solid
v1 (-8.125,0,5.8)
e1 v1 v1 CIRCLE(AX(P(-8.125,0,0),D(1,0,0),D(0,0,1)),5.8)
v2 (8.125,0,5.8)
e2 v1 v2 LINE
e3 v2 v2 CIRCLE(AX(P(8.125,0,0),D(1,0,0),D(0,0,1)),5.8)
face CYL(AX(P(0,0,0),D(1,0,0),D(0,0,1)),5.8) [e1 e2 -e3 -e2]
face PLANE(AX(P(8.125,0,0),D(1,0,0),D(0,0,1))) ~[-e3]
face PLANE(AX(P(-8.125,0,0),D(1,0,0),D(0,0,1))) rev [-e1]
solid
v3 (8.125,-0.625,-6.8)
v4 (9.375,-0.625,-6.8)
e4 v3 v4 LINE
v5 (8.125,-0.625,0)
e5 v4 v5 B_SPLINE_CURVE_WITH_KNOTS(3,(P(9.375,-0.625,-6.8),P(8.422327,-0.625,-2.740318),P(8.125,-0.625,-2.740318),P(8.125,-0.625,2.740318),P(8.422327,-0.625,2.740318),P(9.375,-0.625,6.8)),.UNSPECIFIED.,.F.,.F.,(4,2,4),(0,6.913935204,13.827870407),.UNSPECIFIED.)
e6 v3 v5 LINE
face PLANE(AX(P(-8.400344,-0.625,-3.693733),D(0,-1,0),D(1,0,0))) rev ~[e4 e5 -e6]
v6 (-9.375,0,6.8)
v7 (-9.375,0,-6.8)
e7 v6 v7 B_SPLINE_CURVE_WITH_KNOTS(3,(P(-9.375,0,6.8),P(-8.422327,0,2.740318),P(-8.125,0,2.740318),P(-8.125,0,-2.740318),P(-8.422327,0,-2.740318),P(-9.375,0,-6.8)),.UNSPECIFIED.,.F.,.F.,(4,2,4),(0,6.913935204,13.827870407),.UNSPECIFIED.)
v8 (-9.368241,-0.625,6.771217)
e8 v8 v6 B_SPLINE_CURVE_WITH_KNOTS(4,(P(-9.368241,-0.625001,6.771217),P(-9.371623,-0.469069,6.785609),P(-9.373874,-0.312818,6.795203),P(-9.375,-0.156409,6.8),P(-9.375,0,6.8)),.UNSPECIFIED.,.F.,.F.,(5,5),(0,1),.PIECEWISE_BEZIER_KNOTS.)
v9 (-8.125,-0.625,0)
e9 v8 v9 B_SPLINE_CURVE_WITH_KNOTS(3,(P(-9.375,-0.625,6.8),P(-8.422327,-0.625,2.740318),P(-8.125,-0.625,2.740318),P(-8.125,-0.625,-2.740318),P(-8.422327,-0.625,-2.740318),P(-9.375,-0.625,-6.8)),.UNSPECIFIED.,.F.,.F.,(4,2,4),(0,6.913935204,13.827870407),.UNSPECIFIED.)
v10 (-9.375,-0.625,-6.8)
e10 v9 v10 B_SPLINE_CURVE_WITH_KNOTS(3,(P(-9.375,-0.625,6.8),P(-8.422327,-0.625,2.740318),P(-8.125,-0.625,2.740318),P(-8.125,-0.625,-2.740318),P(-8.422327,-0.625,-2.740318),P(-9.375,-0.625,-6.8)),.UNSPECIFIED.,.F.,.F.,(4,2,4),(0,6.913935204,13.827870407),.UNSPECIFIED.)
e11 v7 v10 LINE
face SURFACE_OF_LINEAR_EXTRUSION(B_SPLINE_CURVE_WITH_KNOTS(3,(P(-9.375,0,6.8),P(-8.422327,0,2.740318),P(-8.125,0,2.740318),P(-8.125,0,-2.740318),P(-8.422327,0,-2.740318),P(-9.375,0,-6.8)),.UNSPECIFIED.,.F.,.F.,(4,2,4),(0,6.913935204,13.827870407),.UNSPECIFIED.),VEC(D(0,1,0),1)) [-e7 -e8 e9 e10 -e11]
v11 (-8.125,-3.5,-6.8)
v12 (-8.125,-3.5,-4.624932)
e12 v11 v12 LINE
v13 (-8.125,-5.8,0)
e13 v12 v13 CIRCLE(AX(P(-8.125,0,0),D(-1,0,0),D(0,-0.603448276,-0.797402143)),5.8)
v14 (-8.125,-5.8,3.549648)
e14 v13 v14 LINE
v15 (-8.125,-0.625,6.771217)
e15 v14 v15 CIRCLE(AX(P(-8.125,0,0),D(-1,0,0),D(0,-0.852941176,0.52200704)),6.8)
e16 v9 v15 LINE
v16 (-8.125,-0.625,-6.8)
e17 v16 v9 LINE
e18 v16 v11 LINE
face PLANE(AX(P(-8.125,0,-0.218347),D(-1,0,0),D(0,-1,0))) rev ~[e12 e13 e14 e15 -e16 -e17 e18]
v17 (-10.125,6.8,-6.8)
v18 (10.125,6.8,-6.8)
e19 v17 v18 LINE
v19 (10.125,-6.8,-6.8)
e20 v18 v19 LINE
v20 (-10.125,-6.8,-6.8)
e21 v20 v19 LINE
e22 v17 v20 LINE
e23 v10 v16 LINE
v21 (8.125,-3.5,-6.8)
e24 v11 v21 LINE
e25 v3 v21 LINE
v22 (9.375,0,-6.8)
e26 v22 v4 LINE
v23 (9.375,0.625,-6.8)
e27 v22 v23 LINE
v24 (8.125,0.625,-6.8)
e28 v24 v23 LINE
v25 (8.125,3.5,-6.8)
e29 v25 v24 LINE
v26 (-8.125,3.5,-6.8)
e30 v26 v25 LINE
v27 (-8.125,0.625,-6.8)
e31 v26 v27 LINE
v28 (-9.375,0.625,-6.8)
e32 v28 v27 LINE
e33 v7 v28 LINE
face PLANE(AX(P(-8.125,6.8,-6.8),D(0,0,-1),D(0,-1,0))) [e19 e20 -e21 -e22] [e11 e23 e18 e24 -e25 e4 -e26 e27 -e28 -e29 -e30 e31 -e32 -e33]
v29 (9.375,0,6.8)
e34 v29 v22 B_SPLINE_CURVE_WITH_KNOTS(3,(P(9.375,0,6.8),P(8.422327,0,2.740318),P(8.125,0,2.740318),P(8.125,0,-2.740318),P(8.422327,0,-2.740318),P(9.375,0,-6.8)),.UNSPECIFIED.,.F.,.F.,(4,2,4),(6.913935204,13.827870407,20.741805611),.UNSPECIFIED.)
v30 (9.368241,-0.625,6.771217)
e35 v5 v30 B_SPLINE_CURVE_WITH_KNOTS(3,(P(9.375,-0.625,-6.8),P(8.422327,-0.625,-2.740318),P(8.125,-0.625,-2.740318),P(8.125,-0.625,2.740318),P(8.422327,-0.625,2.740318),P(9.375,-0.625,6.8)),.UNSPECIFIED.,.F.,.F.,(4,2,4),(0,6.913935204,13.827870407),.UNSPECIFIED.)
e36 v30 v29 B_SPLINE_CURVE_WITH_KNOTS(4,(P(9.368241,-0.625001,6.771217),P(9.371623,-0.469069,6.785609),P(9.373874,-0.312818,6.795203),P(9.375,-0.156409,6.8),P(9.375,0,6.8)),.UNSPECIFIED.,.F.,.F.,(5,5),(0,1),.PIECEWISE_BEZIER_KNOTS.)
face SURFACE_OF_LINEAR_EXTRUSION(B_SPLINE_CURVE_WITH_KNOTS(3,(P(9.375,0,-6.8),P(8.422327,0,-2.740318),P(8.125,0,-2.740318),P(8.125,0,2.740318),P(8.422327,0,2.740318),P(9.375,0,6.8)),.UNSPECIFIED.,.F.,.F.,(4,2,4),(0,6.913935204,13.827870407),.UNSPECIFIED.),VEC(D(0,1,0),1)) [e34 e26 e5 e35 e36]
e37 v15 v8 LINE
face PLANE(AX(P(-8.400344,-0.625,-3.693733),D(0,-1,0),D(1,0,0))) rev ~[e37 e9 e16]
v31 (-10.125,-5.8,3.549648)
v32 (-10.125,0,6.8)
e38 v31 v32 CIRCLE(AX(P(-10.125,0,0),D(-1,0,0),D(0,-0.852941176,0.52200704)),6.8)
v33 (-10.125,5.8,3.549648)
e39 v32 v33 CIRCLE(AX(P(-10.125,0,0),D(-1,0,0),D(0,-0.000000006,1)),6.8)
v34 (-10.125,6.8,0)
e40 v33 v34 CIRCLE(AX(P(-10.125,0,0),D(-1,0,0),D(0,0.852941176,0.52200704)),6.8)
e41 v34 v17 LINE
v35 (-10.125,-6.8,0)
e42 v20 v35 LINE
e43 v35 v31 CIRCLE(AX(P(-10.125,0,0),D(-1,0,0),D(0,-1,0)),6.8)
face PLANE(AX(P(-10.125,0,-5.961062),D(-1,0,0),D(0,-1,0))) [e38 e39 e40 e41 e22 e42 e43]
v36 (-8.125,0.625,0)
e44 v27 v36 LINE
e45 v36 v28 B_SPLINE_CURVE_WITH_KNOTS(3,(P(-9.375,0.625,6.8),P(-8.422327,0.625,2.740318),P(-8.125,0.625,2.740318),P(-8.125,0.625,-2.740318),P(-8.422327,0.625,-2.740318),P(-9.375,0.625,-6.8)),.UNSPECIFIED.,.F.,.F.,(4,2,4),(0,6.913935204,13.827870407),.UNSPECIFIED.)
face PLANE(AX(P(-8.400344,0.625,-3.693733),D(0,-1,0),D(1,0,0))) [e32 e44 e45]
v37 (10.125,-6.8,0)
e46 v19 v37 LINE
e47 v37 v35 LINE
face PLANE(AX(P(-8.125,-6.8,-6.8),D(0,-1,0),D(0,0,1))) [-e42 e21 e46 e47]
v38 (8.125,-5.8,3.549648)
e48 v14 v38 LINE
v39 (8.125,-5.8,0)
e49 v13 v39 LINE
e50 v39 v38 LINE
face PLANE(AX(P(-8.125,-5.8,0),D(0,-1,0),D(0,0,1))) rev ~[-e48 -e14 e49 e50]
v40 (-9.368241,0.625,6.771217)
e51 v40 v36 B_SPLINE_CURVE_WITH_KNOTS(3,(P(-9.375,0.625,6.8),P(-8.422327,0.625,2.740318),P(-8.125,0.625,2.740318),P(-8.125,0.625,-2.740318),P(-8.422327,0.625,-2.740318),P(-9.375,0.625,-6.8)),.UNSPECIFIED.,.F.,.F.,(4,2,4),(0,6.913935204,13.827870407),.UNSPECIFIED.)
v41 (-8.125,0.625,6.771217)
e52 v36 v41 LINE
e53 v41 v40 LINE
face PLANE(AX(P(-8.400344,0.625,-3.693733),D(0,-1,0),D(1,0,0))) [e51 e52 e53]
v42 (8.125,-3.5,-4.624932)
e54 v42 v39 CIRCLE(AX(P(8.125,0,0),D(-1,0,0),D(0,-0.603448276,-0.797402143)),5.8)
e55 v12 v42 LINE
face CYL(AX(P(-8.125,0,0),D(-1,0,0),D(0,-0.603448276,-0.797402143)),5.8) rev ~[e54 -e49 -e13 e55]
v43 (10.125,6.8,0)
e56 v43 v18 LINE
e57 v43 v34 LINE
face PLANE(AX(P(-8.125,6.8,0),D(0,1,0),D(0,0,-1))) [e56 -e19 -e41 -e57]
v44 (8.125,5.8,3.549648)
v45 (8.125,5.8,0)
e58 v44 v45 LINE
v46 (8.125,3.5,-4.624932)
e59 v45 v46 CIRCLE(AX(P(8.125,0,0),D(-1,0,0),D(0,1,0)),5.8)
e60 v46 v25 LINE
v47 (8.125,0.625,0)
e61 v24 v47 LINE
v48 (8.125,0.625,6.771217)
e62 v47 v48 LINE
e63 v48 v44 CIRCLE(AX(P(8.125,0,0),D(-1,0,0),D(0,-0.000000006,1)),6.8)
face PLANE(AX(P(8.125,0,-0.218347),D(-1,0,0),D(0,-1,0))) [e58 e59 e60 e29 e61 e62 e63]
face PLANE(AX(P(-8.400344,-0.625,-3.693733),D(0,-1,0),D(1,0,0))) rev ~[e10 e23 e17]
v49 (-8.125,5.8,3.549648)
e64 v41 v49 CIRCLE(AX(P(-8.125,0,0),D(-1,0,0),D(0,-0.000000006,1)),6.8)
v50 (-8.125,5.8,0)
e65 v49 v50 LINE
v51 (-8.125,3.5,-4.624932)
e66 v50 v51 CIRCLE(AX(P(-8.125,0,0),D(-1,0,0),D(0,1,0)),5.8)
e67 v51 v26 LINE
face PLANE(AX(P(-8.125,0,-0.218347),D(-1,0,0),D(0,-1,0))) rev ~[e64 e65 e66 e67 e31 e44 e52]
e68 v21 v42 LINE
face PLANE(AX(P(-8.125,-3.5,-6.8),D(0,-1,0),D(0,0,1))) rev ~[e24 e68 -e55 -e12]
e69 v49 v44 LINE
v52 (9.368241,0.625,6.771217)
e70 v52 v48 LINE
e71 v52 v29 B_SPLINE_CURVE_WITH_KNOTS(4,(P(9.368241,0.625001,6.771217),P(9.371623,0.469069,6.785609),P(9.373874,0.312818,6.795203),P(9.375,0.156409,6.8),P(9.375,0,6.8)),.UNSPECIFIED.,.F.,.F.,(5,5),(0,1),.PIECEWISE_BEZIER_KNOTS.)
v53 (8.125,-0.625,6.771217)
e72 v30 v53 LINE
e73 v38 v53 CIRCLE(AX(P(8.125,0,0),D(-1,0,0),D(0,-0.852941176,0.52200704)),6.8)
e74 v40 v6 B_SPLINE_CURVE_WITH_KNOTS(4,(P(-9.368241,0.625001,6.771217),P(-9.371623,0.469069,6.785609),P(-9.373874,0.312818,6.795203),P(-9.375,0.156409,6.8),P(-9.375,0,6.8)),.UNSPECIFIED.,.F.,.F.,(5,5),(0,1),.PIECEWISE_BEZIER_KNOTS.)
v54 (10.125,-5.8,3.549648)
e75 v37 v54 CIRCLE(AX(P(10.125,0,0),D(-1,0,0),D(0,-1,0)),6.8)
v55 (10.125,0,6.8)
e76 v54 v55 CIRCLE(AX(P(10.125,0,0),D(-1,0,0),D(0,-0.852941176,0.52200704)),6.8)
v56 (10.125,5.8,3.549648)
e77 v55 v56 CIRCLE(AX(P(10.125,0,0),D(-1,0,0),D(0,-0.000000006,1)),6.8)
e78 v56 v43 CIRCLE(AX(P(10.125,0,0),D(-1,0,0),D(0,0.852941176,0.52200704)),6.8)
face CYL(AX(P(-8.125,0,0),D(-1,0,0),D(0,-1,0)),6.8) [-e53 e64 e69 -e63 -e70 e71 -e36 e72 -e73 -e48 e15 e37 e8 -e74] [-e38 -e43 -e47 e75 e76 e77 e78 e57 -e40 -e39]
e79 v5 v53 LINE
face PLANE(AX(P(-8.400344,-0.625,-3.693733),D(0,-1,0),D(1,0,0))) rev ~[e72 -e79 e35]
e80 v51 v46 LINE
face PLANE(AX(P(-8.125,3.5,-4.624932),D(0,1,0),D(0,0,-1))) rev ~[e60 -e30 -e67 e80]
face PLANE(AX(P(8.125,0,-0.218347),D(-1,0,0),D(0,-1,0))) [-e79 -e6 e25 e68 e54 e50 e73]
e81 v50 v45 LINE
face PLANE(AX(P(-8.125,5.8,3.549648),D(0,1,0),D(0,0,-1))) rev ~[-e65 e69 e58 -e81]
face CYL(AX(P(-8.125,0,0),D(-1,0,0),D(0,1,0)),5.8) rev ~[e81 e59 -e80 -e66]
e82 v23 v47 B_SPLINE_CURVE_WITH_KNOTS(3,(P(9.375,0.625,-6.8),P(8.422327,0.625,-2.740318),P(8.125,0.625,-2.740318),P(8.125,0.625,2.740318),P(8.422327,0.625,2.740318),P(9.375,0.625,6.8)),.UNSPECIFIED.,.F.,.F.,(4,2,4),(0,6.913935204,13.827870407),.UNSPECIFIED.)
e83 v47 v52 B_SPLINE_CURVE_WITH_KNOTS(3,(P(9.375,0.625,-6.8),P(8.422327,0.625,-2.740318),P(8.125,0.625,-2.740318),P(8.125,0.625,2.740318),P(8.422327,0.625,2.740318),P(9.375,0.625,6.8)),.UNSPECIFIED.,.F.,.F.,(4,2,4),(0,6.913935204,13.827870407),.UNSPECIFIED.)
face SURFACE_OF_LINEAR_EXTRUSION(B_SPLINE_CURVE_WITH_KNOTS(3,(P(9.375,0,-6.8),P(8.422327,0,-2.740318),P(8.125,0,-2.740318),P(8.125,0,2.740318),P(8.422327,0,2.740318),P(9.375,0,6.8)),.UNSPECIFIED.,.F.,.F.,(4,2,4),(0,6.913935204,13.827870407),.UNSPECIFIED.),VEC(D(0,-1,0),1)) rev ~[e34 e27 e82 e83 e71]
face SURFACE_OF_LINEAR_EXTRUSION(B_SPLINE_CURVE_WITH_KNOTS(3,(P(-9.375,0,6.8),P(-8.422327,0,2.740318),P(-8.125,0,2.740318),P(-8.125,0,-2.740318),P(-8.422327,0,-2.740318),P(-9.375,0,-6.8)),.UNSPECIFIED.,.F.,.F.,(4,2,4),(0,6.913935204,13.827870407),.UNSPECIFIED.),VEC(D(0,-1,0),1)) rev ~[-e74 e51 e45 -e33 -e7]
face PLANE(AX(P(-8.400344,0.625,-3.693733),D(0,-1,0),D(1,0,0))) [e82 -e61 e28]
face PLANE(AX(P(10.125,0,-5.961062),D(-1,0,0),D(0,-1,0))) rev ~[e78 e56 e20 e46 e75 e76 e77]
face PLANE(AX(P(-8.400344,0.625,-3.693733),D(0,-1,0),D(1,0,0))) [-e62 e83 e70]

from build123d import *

# Parameters (mm, degrees)
F0_W          = 16.25
F0_H          = 5.8
F3_DEPTH      = 2
F3_DEPTH_BACK = 18.25
F4_DEPTH      = 16.25
F6_DEPTH      = 0.625


with BuildPart() as f1:
    # F0 (on Front) → F1 (revolve)
    with BuildSketch(Plane.XZ):
        with Locations((0, 2.9)):
            Rectangle(F0_W, F0_H)
    revolve(axis=Axis((0, 0, 0), (1, 0, 0)))


with BuildPart() as f3:
    # F2 (on face) → F3 (new body, two sides)
    with BuildSketch(Plane(origin=(-8.125, 0, 0), x_dir=(0, -1, 0), z_dir=(-1, 0, 0))) as f3_sk:
        with BuildLine():
            Line((-3.5, -6.8), (3.5, -6.8))
            Line((3.5, -6.8), (3.5, -4.6249324319))
            ThreePointArc((3.5, -4.6249324319), (0, -5.8), (-3.5, -4.6249324319))
            Line((-3.5, -4.6249324319), (-3.5, -6.8))
        make_face()
        with BuildLine():
            Line((3.5, -6.8), (6.8, -6.8))
            Line((6.8, -6.8), (6.8, 0))
            ThreePointArc((6.8, 0), (6.5452272688, 1.8439088915), (5.8, 3.5496478699))
            Line((5.8, 3.5496478699), (5.8, 0))
            ThreePointArc((5.8, 0), (5.193264869, -2.582634314), (3.5, -4.6249324319))
            Line((3.5, -4.6249324319), (3.5, -6.8))
        make_face()
        with BuildLine():
            Line((-6.8, -6.8), (-3.5, -6.8))
            Line((-3.5, -6.8), (-3.5, -4.6249324319))
            ThreePointArc((-3.5, -4.6249324319), (-5.193264869, -2.582634314), (-5.8, 0))
            Line((-5.8, 0), (-5.8, 3.5496478699))
            ThreePointArc((-5.8, 3.5496478699), (-6.5452272688, 1.8439088915), (-6.8, 0))
            Line((-6.8, 0), (-6.8, -6.8))
        make_face()
        with BuildLine():
            Line((5.8, 0), (5.8, 3.5496478699))
            ThreePointArc((5.8, 3.5496478699), (3.3243341229, 5.9320150572), (4.08e-08, 6.8))
            ThreePointArc((4.08e-08, 6.8), (-3.3243340873, 5.9320150772), (-5.8, 3.5496478699))
            Line((-5.8, 3.5496478699), (-5.8, 0))
            ThreePointArc((-5.8, 0), (0, 5.8), (5.8, 0))
        make_face()
        with BuildLine():
            ThreePointArc((-3.5, -4.6249324319), (0, -5.8), (3.5, -4.6249324319))
            ThreePointArc((3.5, -4.6249324319), (5.193264869, -2.582634314), (5.8, 0))
            ThreePointArc((5.8, 0), (0, 5.8), (-5.8, 0))
            ThreePointArc((-5.8, 0), (-5.193264869, -2.582634314), (-3.5, -4.6249324319))
        make_face()
    extrude(amount=F3_DEPTH)
    extrude(f3_sk.sketch, amount=-F3_DEPTH_BACK)

    # F2 (on face) → F4 (cut, through all)
    with BuildSketch(Plane(origin=(-8.125, 0, 0), x_dir=(0, -1, 0), z_dir=(-1, 0, 0))):
        with BuildLine():
            ThreePointArc((-3.5, -4.6249324319), (0, -5.8), (3.5, -4.6249324319))
            ThreePointArc((3.5, -4.6249324319), (5.193264869, -2.582634314), (5.8, 0))
            ThreePointArc((5.8, 0), (0, 5.8), (-5.8, 0))
            ThreePointArc((-5.8, 0), (-5.193264869, -2.582634314), (-3.5, -4.6249324319))
        make_face()
        with BuildLine():
            Line((5.8, 0), (5.8, 3.5496478699))
            ThreePointArc((5.8, 3.5496478699), (3.3243341229, 5.9320150572), (4.08e-08, 6.8))
            ThreePointArc((4.08e-08, 6.8), (-3.3243340873, 5.9320150772), (-5.8, 3.5496478699))
            Line((-5.8, 3.5496478699), (-5.8, 0))
            ThreePointArc((-5.8, 0), (0, 5.8), (5.8, 0))
        make_face()
        with BuildLine():
            Line((-3.5, -6.8), (3.5, -6.8))
            Line((3.5, -6.8), (3.5, -4.6249324319))
            ThreePointArc((3.5, -4.6249324319), (0, -5.8), (-3.5, -4.6249324319))
            Line((-3.5, -4.6249324319), (-3.5, -6.8))
        make_face()
    extrude(amount=-F4_DEPTH, mode=Mode.SUBTRACT)

    # F5 (on Front) → F6 (cut, symmetric)
    with BuildSketch(Plane.XZ):
        with BuildLine():
            Line((-9.375, -6.8), (-8.125, -6.8))
            Line((-8.125, -6.8), (-8.125, -4.6249324319))
            Line((-8.125, -4.6249324319), (-8.125, 0))
            add(Edge.make_bspline(
                [(-8.125, 0), (-8.125, -2.7403182344), (-8.4223272721, -2.7403182344), (-9.375, -6.8)],
                knots=[0, 0, 0, 0, 6.9139352036, 6.9139352036, 6.9139352036, 6.9139352036], degree=3))
        make_face()
        Polygon((-8.125, -4.6249324319), (-8.125, -6.8), (8.125, -6.8), (8.125, -4.6249324319), (8.125, 0), (8.125, 3.5496478699), (8.125, 6.8), (-8.125, 6.8), (-8.125, 3.5496478699), (-8.125, 0), align=None)
        with BuildLine():
            Line((8.125, -4.6249324319), (8.125, -6.8))
            Line((8.125, -6.8), (9.375, -6.8))
            add(Edge.make_bspline(
                [(8.125, 0), (8.125, -2.7403182344), (8.4223272721, -2.7403182344), (9.375, -6.8)],
                knots=[0, 0, 0, 0, 6.9139352036, 6.9139352036, 6.9139352036, 6.9139352036], degree=3))
            Line((8.125, 0), (8.125, -4.6249324319))
        make_face()
        with BuildLine():
            add(Edge.make_bspline(
                [(-8.125, 0), (-8.125, 2.7403182344), (-8.4223272721, 2.7403182344), (-9.375, 6.8)],
                knots=[0, 0, 0, 0, 6.9139352036, 6.9139352036, 6.9139352036, 6.9139352036], degree=3))
            Line((-8.125, 0), (-8.125, 3.5496478699))
            Line((-8.125, 3.5496478699), (-8.125, 6.8))
            Line((-8.125, 6.8), (-9.375, 6.8))
        make_face()
        with BuildLine():
            Line((8.125, 3.5496478699), (8.125, 0))
            add(Edge.make_bspline(
                [(8.125, 0), (8.125, 2.7403182344), (8.4223272721, 2.7403182344), (9.375, 6.8)],
                knots=[0, 0, 0, 0, 6.9139352036, 6.9139352036, 6.9139352036, 6.9139352036], degree=3))
            Line((9.375, 6.8), (8.125, 6.8))
            Line((8.125, 6.8), (8.125, 3.5496478699))
        make_face()
    extrude(amount=F6_DEPTH, both=True, mode=Mode.SUBTRACT)


solid = Compound([f1.part, f3.part])
